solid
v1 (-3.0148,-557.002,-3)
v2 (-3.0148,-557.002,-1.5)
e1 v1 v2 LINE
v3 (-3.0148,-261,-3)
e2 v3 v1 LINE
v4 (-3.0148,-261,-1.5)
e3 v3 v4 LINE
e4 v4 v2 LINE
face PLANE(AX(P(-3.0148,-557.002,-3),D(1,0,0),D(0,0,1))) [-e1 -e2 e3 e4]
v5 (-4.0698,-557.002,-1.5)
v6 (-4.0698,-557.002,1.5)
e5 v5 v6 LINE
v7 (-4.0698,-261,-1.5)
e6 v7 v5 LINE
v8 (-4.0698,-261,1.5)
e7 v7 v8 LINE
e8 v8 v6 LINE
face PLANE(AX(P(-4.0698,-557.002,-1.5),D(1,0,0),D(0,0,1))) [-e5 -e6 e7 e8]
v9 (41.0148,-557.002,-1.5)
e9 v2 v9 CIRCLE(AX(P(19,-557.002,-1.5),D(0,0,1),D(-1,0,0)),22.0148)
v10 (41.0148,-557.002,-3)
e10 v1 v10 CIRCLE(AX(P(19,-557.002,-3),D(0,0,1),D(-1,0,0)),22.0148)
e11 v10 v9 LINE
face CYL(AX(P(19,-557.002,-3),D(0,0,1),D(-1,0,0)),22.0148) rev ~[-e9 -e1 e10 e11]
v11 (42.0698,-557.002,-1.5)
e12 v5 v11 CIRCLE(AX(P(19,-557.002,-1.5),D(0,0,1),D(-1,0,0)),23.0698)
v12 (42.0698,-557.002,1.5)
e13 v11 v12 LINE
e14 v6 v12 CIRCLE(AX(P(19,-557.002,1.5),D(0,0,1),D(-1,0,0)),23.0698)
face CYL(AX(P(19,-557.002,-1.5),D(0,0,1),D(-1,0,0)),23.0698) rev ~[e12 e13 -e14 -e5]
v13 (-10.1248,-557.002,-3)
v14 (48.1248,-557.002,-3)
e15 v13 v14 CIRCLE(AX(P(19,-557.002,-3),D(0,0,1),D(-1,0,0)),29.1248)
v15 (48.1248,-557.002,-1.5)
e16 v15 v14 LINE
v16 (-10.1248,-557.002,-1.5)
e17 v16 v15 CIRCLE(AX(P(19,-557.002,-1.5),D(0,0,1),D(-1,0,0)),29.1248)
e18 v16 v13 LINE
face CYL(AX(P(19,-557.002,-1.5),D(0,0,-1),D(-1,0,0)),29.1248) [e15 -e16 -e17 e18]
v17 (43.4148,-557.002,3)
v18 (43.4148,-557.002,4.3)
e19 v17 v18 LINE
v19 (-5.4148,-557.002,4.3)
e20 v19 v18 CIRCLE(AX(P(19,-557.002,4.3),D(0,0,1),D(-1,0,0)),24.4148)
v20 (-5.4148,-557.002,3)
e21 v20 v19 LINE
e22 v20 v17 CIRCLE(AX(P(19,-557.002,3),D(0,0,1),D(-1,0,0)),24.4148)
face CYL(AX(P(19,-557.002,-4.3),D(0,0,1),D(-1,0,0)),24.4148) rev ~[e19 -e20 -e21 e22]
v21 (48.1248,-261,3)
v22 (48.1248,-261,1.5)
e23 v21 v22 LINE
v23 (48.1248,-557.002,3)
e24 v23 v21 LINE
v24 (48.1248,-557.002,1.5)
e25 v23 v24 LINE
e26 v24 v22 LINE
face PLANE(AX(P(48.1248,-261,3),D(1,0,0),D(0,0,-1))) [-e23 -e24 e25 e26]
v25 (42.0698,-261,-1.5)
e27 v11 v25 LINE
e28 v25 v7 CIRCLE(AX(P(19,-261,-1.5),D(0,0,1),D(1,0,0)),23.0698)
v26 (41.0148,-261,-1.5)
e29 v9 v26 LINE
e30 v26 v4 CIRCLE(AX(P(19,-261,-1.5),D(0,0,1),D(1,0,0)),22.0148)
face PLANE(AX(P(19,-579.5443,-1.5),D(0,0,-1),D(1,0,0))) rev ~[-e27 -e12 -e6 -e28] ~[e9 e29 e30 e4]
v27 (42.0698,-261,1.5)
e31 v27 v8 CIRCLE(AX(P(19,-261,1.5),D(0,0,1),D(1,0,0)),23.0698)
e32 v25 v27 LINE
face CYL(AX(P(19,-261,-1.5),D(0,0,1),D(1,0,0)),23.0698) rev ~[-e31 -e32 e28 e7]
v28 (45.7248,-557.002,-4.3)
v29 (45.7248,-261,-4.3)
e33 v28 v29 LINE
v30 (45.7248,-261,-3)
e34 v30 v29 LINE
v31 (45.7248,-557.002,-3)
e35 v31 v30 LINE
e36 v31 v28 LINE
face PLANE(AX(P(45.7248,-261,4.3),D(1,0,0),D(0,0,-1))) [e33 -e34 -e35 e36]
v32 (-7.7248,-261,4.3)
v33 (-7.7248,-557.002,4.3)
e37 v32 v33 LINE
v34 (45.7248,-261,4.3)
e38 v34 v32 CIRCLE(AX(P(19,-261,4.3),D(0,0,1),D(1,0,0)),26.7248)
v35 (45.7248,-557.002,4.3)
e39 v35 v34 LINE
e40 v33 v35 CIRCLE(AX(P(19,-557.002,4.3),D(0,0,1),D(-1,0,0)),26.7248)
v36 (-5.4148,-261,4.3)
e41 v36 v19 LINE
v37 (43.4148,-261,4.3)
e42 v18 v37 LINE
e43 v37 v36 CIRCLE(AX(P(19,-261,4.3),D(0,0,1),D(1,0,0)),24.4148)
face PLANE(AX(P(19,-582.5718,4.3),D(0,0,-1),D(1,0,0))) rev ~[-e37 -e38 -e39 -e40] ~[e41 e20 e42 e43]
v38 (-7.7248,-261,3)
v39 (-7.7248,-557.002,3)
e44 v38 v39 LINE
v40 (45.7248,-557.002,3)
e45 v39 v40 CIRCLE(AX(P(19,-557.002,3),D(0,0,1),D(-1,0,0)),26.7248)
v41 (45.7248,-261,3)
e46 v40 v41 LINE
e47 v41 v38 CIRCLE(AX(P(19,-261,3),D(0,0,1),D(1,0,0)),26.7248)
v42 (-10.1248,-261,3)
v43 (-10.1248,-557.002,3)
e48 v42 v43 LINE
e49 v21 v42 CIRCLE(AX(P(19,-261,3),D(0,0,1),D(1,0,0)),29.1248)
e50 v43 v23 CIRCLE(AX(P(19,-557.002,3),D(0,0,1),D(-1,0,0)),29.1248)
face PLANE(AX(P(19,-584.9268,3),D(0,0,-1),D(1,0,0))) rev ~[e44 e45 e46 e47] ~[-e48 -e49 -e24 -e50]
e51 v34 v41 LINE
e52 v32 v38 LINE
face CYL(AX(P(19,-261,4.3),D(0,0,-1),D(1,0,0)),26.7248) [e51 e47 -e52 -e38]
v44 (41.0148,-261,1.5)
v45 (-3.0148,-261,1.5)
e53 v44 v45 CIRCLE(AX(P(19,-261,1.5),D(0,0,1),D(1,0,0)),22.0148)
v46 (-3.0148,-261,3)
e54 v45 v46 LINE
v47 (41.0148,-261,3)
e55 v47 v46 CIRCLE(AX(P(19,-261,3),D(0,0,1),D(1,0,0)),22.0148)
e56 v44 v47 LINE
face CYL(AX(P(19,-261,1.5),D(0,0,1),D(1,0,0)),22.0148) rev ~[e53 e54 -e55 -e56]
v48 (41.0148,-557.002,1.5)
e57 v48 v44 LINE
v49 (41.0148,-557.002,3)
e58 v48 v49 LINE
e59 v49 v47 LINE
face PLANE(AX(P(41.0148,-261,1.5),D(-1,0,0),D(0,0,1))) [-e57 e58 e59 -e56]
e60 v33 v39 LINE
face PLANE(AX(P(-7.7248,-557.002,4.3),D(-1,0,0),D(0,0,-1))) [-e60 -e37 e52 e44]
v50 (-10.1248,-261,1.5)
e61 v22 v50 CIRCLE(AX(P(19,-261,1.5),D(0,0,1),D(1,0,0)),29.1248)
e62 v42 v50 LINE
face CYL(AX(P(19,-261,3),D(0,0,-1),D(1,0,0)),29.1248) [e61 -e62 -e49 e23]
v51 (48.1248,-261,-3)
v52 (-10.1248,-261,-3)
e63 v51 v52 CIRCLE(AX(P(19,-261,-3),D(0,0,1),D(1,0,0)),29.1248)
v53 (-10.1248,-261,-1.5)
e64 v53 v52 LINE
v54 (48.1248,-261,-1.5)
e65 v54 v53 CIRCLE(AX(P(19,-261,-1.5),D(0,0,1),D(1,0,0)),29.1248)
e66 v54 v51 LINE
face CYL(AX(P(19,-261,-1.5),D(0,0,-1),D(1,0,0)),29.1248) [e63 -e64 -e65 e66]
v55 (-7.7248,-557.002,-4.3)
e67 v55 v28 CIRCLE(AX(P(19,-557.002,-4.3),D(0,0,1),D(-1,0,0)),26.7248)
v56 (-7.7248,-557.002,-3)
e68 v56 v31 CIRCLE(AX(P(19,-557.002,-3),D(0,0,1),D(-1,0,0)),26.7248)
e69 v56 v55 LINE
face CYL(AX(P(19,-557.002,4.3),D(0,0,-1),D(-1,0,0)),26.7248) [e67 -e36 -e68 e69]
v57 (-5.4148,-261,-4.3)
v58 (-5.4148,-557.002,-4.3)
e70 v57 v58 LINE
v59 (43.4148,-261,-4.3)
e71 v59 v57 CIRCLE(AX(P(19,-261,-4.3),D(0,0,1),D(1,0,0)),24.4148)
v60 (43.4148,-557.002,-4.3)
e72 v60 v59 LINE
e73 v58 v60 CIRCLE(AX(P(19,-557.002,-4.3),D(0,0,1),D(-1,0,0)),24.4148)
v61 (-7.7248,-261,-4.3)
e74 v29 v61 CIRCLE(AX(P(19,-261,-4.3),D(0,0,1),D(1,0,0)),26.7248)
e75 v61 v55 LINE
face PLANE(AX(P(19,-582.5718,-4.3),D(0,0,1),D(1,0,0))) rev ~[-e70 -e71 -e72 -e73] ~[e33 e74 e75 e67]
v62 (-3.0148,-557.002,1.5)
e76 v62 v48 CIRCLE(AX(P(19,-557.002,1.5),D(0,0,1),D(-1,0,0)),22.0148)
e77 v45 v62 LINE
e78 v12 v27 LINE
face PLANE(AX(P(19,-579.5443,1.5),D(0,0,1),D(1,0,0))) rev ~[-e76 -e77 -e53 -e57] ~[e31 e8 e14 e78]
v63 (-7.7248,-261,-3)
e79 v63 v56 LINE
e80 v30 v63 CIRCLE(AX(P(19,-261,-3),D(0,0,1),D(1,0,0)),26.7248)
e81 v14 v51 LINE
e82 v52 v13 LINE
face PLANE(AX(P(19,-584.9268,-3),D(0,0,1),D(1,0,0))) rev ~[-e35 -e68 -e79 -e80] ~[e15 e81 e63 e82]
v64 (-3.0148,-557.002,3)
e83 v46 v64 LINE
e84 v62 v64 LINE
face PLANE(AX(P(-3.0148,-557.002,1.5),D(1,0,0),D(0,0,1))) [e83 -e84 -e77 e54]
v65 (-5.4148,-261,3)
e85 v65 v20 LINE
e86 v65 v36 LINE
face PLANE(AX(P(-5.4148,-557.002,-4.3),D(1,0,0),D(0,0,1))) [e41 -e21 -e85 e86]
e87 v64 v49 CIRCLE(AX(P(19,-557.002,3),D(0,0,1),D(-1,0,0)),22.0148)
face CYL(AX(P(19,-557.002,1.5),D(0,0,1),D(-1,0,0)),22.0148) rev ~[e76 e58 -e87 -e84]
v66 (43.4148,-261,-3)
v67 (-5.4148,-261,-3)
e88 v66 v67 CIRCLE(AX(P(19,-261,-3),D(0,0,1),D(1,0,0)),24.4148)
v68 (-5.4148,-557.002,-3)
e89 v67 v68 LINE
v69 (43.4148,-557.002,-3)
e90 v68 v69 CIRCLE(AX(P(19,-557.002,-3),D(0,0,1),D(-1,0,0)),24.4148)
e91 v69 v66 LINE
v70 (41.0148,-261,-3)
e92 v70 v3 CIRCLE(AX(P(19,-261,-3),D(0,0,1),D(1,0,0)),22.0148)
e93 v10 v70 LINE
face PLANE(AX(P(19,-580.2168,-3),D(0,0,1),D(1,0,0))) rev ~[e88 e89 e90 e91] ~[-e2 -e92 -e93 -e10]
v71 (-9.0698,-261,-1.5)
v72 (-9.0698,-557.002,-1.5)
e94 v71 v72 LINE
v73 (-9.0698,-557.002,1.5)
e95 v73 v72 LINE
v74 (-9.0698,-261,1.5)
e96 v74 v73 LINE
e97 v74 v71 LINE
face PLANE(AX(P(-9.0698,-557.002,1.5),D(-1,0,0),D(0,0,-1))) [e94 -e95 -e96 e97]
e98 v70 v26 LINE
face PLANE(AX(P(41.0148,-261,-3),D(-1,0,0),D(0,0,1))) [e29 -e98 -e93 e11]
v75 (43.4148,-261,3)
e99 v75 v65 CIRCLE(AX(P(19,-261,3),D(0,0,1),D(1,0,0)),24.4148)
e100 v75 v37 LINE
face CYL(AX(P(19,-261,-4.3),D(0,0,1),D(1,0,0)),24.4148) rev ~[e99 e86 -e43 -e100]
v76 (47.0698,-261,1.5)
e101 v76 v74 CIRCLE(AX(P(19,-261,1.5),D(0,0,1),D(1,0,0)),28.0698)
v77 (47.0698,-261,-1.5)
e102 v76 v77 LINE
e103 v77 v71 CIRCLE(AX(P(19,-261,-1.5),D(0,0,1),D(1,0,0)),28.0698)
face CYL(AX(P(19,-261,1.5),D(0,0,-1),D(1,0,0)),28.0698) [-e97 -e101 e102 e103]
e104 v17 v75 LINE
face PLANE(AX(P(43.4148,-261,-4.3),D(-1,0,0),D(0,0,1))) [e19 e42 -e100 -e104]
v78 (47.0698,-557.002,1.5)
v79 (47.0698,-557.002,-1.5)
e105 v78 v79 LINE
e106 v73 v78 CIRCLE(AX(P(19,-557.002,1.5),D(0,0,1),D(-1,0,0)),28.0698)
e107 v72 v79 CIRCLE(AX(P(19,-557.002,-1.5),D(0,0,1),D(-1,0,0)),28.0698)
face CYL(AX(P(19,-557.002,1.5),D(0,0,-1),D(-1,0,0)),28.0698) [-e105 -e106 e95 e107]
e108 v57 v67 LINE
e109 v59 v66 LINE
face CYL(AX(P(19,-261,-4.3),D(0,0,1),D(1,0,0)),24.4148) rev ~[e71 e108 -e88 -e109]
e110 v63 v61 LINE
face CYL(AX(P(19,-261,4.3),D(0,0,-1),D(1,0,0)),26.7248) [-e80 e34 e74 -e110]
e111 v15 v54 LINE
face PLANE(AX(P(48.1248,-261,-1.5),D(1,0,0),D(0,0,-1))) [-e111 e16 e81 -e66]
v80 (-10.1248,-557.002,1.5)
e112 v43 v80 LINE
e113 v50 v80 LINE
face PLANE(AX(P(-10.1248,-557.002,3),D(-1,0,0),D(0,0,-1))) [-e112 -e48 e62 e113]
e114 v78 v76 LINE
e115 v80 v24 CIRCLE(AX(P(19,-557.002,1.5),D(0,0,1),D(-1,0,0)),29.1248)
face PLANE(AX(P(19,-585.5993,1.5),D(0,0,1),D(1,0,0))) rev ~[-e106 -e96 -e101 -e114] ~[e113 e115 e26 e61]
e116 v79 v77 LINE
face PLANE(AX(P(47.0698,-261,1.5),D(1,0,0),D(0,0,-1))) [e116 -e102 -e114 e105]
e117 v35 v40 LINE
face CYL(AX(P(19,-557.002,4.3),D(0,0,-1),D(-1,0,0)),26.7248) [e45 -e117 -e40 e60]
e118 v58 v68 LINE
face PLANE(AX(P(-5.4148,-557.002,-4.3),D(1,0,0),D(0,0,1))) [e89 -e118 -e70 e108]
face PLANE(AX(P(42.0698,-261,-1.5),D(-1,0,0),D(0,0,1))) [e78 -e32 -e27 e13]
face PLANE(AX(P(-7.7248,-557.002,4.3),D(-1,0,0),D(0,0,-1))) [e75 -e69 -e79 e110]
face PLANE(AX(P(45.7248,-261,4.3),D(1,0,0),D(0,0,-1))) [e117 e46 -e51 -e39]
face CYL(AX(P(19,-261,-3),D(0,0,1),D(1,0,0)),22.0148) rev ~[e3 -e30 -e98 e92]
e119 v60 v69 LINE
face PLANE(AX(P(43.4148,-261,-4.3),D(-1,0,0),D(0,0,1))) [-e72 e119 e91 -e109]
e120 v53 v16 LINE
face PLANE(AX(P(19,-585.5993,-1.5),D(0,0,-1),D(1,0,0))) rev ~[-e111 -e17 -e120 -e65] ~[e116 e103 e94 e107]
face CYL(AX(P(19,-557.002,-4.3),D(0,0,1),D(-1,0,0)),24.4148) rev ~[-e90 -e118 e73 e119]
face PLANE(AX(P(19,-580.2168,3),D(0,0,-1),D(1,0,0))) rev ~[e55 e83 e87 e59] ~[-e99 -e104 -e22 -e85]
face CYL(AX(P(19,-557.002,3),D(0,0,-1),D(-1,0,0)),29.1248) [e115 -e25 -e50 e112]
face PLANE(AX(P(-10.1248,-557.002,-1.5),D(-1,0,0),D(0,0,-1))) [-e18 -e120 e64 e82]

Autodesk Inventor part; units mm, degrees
ref_plane "Work Plane2" through (19, -557.002, 0) normal (-1, 0, 0) x (0, 0, 1)
ref_plane "Work Plane3" through (19, -261, 0) normal (-0.3089426, -0.9510807, 0) x (0, 0, 1)
sketch "Path" plane through (0, 0, 0) normal (0, 0, 1) x (1, 0, 0)
  arc A0 (-6.5698, -557.002) -> (44.5698, -557.002) centre (19, -557.002) ccw
  arc A1 (44.5698, -261) -> (-6.5698, -261) centre (19, -261) ccw
  line L0 (44.5698, -261) -> (44.5698, -557.002)
  line L1 (-6.5698, -557.002) -> (-6.5698, -261)
ref_plane "Section Plane" through (44.5698, -557.002, 0) normal (0, 1, 0) x (0, 0, 1)
sketch "Section Sketch" plane through (44.5698, -557.002, 0) normal (0, 1, 0) x (0, 0, 1)
  line L0 (-4.3, -1.155) -> (4.3, -1.155)
  line L1 (4.3, -1.155) -> (4.3, 1.155)
  line L2 (4.3, 1.155) -> (-4.3, 1.155)
  line L3 (-4.3, 1.155) -> (-4.3, -1.155)
  line L4 (-1.5, -2.5) -> (1.5, -2.5)
  line L5 (1.5, -2.5) -> (1.5, 2.5)
  line L6 (1.5, 2.5) -> (-1.5, 2.5)
  line L7 (-1.5, 2.5) -> (-1.5, -2.5)
  line L8 (-1.5, 0) -> (1.5, 0) construction
  line L9 (-3, -3.555) -> (-1.5, -3.555)
  line L10 (-1.5, -3.555) -> (-1.5, 3.555)
  line L11 (-1.5, 3.555) -> (-3, 3.555)
  line L12 (-3, 3.555) -> (-3, -3.555)
  line L13 (1.5, -3.555) -> (3, -3.555)
  line L14 (3, -3.555) -> (3, 3.555)
  line L15 (3, 3.555) -> (1.5, 3.555)
  line L16 (1.5, 3.555) -> (1.5, -3.555)
  line L17 (-4.3, 0) -> (4.3, 0) construction
  point P0 (0, 0)
  point P1 (0, 0)
  dimension "d21" = 2.31
  dimension "d22" = 5
  dimension "d23" = 3
  dimension "d24" = 1.5
  dimension "d31" = 7.11
  dimension "d32" = 8.6
sweep "Solid" add profiles "Section Sketch" path "Path"
pattern_of_one "Strand Pattern"
equation "\"d21\" = da_d2"
equation "\"d22\" = da_d1"
equation "\"d23\" = da_b1"
equation "\"d24\" = da_t1 + da_t2"
equation "\"d30\" = da_pt"
equation "\"da_p\" = 8"
equation "\"da_b1\" = 3"
equation "\"da_h2\" = 7.11"
equation "\"da_h3\" = 7.11"
equation "\"da_d1\" = 5"
equation "\"da_d2\" = 2.31"
equation "\"da_pt\" = 5.64"
equation "\"da_b\" = 8.6"
equation "\"da_t1\" = 0.75"
equation "\"da_t2\" = 0.75"
properties part number "Roller Chain"
